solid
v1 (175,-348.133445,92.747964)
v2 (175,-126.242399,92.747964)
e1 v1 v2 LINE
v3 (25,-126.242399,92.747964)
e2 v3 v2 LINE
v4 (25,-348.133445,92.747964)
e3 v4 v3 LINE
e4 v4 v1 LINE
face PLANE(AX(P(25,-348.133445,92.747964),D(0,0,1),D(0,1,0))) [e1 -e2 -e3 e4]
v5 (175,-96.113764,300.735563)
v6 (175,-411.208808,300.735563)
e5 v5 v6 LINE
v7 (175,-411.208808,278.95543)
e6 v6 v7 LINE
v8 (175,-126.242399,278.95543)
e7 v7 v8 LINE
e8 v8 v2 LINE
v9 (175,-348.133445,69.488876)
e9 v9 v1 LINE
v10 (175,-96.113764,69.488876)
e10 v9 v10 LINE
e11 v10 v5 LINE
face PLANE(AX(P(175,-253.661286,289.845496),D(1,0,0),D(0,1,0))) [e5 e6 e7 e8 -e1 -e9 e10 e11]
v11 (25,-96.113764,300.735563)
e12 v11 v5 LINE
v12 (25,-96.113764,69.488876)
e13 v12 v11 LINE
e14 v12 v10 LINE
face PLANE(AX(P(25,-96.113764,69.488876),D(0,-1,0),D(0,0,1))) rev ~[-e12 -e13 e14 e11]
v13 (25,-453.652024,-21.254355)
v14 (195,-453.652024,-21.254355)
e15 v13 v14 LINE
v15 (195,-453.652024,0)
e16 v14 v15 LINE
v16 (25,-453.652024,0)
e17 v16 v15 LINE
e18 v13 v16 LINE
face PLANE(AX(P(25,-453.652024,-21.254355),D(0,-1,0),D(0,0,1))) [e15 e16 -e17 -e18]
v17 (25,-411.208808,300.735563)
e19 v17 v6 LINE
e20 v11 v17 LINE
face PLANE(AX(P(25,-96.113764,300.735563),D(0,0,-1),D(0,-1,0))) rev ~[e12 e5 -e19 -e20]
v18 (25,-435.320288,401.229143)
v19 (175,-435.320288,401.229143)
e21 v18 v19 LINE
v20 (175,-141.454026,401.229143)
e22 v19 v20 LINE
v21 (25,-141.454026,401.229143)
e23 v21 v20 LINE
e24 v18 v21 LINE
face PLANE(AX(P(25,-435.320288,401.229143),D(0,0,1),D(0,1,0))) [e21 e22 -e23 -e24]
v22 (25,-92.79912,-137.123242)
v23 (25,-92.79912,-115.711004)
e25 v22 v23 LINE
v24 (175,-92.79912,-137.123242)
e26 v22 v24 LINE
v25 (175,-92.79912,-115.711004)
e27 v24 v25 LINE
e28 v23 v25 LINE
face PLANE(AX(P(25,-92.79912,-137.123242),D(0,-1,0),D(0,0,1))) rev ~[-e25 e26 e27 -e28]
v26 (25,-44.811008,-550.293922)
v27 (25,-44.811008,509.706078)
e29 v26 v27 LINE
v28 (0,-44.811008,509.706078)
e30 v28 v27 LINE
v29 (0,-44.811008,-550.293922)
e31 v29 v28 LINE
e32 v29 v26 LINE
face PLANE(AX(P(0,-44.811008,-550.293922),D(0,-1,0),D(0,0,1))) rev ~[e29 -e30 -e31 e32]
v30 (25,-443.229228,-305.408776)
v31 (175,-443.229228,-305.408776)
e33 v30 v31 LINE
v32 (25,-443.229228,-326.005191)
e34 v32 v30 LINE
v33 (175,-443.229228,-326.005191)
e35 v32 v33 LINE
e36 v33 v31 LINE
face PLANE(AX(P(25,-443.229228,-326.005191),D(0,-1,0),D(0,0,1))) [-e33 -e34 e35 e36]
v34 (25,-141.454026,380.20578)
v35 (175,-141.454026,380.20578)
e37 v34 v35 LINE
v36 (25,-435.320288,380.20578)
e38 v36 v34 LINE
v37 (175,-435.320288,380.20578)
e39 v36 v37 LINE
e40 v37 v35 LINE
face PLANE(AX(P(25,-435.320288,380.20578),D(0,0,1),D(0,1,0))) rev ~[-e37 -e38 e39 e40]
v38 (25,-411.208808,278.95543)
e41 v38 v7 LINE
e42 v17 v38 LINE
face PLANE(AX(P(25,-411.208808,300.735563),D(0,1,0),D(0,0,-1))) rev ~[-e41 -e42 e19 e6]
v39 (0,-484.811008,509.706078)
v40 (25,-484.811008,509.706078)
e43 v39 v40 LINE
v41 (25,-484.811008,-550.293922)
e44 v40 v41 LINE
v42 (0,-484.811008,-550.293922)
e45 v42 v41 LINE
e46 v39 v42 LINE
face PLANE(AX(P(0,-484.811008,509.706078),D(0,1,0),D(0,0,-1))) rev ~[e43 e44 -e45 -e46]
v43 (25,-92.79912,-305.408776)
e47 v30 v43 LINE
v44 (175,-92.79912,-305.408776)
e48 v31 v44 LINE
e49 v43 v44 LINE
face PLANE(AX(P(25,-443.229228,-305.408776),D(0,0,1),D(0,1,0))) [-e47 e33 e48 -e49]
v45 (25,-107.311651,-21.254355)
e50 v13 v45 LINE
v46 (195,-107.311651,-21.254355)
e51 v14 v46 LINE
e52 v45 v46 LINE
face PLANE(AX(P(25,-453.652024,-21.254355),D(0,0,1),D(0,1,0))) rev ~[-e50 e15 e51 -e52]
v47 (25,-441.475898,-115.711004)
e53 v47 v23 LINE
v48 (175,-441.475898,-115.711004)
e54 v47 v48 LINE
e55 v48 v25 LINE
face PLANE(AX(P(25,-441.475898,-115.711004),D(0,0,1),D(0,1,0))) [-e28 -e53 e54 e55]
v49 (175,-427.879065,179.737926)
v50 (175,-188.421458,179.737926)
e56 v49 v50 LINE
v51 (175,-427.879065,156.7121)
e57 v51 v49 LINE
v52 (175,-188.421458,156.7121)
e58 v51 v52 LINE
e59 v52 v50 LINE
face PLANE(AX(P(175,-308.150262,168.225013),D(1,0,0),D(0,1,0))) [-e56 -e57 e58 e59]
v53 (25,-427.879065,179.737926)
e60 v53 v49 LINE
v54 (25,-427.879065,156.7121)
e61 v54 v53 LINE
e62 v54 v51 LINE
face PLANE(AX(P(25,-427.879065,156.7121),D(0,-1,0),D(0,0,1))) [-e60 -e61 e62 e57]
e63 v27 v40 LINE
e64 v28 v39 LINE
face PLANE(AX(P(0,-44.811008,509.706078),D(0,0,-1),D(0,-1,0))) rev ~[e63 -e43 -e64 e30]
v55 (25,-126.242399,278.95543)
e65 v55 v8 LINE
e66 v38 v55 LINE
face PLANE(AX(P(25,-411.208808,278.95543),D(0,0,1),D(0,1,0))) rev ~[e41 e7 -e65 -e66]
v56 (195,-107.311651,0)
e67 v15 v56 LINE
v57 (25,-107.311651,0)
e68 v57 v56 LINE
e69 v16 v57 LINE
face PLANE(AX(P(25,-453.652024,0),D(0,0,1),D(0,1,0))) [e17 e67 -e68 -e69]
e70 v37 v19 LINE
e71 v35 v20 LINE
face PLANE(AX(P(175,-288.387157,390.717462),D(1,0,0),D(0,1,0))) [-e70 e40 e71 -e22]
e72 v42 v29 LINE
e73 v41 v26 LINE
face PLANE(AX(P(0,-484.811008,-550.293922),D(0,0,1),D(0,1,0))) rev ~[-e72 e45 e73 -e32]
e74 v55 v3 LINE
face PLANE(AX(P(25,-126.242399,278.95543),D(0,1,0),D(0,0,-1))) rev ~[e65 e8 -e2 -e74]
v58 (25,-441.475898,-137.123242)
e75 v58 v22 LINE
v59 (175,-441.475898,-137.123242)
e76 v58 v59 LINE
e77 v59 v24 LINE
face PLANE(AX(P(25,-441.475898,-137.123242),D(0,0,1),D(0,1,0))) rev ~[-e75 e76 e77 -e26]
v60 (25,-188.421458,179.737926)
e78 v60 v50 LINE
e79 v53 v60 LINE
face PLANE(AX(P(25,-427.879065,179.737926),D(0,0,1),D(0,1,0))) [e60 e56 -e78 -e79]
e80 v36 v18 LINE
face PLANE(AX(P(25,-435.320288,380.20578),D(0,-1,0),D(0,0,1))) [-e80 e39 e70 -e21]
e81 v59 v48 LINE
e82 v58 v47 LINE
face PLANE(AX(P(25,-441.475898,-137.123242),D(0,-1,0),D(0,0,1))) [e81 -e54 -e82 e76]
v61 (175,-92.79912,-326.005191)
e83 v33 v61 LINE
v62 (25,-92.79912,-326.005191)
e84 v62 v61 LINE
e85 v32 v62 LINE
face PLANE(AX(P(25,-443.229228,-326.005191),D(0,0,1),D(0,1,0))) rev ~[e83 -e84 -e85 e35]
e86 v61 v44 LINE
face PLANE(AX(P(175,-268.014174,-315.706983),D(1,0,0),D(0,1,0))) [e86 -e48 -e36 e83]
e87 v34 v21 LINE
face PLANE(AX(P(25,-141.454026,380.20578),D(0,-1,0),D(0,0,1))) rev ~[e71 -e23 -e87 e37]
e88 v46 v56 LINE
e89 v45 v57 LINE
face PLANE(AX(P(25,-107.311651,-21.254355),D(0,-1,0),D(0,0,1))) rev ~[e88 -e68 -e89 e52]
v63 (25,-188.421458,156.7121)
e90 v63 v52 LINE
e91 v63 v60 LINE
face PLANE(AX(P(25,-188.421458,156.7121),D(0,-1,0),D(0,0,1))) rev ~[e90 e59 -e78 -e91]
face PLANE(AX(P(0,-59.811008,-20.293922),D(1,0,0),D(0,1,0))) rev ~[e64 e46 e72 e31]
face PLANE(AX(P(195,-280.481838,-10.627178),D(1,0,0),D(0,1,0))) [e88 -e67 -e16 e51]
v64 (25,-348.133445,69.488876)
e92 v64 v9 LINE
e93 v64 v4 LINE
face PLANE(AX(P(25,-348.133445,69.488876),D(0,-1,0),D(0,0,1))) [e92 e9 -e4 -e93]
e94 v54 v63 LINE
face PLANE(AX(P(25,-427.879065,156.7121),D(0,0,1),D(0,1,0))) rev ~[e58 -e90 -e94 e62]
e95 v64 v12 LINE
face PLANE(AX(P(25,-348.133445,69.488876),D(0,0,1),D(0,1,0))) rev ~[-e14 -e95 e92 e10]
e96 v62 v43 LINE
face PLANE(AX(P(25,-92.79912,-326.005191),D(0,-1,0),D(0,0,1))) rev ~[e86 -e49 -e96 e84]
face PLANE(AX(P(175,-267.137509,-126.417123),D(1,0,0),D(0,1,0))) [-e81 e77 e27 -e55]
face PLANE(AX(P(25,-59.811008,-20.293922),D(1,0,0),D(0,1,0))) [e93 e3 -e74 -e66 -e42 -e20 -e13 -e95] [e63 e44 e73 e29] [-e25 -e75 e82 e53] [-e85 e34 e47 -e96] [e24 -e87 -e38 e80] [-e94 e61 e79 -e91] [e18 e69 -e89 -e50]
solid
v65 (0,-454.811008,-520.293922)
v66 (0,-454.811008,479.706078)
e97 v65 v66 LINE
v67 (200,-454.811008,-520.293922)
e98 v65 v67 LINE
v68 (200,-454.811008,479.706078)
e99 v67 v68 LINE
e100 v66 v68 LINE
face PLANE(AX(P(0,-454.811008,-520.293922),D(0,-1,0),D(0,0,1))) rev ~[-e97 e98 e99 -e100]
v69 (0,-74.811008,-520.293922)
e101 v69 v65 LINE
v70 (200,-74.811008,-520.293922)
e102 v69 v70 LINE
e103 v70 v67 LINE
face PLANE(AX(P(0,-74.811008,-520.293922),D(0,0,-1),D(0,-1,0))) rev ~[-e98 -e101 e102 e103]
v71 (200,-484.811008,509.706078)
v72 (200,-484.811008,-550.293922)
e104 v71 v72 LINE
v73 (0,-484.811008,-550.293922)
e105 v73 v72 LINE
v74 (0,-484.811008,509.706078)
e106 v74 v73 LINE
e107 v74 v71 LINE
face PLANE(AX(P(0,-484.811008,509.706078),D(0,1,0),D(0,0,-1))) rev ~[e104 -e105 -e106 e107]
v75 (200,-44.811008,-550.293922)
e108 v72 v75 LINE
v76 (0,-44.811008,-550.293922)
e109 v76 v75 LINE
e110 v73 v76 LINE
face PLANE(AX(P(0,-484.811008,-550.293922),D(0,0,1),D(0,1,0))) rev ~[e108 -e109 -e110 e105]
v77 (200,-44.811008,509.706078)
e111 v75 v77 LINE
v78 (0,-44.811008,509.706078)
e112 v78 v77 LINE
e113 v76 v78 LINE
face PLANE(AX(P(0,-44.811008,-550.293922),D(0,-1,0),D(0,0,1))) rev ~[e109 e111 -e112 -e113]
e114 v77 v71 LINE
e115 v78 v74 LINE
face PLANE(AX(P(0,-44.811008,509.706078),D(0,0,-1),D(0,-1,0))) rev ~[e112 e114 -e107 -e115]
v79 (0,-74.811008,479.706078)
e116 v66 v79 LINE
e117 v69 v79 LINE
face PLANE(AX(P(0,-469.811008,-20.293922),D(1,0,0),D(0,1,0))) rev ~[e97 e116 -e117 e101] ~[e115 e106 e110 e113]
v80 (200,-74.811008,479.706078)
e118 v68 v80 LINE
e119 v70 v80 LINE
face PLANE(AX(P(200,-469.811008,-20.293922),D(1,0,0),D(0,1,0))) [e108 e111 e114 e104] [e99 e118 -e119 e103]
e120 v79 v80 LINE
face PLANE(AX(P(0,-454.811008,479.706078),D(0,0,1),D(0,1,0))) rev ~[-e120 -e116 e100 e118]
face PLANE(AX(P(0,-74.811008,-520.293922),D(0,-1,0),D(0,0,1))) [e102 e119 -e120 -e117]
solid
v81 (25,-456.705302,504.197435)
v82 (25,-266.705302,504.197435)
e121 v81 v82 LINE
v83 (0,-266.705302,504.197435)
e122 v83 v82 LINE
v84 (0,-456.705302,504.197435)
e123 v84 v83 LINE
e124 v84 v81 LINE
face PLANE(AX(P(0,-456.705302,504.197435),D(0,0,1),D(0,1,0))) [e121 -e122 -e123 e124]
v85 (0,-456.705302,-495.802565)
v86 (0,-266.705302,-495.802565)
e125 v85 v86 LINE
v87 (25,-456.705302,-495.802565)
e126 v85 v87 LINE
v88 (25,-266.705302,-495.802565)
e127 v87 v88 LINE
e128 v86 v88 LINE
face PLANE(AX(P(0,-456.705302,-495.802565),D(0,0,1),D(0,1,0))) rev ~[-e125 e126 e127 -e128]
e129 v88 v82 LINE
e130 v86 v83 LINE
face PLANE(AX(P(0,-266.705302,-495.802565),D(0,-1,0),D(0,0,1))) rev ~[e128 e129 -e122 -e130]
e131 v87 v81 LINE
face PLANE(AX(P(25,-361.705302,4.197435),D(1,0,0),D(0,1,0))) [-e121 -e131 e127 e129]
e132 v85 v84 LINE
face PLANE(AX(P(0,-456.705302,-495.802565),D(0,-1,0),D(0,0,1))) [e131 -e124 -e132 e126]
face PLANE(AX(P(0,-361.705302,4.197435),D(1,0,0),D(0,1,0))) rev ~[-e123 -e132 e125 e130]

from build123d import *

# Parameters (mm, degrees)
F0_W     = 30
F0_H     = 1000
F1_DEPTH = 200
F0_W_2   = 380
F2_DEPTH = 25
F3_W     = 190
F3_H     = 1000
F4_DEPTH = 25
F5_W     = 293.8662618399
F5_H     = 21.023362875
F5_W_2   = 239.4576072693
F5_H_2   = 23.0258256197
F5_W_3   = 221.8910455704
F5_H_3   = 23.259088397
F5_W_4   = 348.6767783761
F5_H_4   = 21.4122384787
F5_W_5   = 350.4301086068
F5_H_5   = 20.5964148045
F6_DEPTH = 150
F7_W     = 346.3403731585
F7_H     = 21.2543550879
F8_DEPTH = 170


with BuildPart() as f1:
    # F0 (on Right) → F1 (new body)
    with BuildSketch(Plane.YZ):
        with Locations((-469.8110079765, -20.2939224243)):
            Rectangle(F0_W, F0_H)
        with Locations((-59.8110079765, -20.2939224243)):
            Rectangle(F0_W, F0_H)
        Polygon((-484.8110079765, 479.7060775757), (-454.8110079765, 479.7060775757), (-74.8110079765, 479.7060775757), (-44.8110079765, 479.7060775757), (-44.8110079765, 509.7060775757), (-484.8110079765, 509.7060775757), align=None)
        Polygon((-74.8110079765, -520.2939224243), (-454.8110079765, -520.2939224243), (-484.8110079765, -520.2939224243), (-484.8110079765, -550.2939224243), (-44.8110079765, -550.2939224243), (-44.8110079765, -520.2939224243), align=None)
    extrude(amount=F1_DEPTH)


with BuildPart() as f2:
    # F0 (on Right) → F2 (new body)
    with BuildSketch(Plane.YZ):
        with Locations((-59.8110079765, -20.2939224243)):
            Rectangle(F0_W, F0_H)
        Polygon((-484.8110079765, 479.7060775757), (-454.8110079765, 479.7060775757), (-74.8110079765, 479.7060775757), (-44.8110079765, 479.7060775757), (-44.8110079765, 509.7060775757), (-484.8110079765, 509.7060775757), align=None)
        Polygon((-74.8110079765, -520.2939224243), (-454.8110079765, -520.2939224243), (-484.8110079765, -520.2939224243), (-484.8110079765, -550.2939224243), (-44.8110079765, -550.2939224243), (-44.8110079765, -520.2939224243), align=None)
        with Locations((-469.8110079765, -20.2939224243)):
            Rectangle(F0_W, F0_H)
        with Locations((-264.8110079765, -20.2939224243)):
            Rectangle(F0_W_2, F0_H)
    extrude(amount=F2_DEPTH)

    # F5 (on face) → F6 (join)
    with BuildSketch(Plane.YZ.offset(25)):
        with Locations((-288.387157023, 390.7174617052)):
            Rectangle(F5_W, F5_H)
        Polygon((-96.1137637496, 300.7355630398), (-411.2088084221, 300.7355630398), (-411.2088084221, 278.9554297924), (-126.2423992157, 278.9554297924), (-96.1137637496, 278.9554297924), align=None)
        with Locations((-308.1502616405, 168.2250127196)):
            Rectangle(F5_W_2, F5_H_2)
        with Locations((-237.1879220009, 81.1184197664)):
            Rectangle(F5_W_3, F5_H_3)
        Polygon((-96.1137637496, 69.4888755679), (-96.1137637496, 278.9554297924), (-126.2423992157, 278.9554297924), (-126.2423992157, 92.7479639649), (-126.2423992157, 69.4888755679), align=None)
        with Locations((-267.1375088394, -126.4171227813)):
            Rectangle(F5_W_4, F5_H_4)
        with Locations((-268.0141739547, -315.7069832087)):
            Rectangle(F5_W_5, F5_H_5)
    extrude(amount=F6_DEPTH)

    # F7 (on face) → F8 (join)
    with BuildSketch(Plane.YZ.offset(25)):
        with Locations((-280.4818376899, -10.6271775439)):
            Rectangle(F7_W, F7_H)
    extrude(amount=F8_DEPTH)


with BuildPart() as f4:
    # F3 (on Right) → F4 (new body)
    with BuildSketch(Plane.YZ):
        with Locations((-361.7053023411, 4.1974354535)):
            Rectangle(F3_W, F3_H)
    extrude(amount=F4_DEPTH)


solid = Compound([f1.part, f2.part, f4.part])
